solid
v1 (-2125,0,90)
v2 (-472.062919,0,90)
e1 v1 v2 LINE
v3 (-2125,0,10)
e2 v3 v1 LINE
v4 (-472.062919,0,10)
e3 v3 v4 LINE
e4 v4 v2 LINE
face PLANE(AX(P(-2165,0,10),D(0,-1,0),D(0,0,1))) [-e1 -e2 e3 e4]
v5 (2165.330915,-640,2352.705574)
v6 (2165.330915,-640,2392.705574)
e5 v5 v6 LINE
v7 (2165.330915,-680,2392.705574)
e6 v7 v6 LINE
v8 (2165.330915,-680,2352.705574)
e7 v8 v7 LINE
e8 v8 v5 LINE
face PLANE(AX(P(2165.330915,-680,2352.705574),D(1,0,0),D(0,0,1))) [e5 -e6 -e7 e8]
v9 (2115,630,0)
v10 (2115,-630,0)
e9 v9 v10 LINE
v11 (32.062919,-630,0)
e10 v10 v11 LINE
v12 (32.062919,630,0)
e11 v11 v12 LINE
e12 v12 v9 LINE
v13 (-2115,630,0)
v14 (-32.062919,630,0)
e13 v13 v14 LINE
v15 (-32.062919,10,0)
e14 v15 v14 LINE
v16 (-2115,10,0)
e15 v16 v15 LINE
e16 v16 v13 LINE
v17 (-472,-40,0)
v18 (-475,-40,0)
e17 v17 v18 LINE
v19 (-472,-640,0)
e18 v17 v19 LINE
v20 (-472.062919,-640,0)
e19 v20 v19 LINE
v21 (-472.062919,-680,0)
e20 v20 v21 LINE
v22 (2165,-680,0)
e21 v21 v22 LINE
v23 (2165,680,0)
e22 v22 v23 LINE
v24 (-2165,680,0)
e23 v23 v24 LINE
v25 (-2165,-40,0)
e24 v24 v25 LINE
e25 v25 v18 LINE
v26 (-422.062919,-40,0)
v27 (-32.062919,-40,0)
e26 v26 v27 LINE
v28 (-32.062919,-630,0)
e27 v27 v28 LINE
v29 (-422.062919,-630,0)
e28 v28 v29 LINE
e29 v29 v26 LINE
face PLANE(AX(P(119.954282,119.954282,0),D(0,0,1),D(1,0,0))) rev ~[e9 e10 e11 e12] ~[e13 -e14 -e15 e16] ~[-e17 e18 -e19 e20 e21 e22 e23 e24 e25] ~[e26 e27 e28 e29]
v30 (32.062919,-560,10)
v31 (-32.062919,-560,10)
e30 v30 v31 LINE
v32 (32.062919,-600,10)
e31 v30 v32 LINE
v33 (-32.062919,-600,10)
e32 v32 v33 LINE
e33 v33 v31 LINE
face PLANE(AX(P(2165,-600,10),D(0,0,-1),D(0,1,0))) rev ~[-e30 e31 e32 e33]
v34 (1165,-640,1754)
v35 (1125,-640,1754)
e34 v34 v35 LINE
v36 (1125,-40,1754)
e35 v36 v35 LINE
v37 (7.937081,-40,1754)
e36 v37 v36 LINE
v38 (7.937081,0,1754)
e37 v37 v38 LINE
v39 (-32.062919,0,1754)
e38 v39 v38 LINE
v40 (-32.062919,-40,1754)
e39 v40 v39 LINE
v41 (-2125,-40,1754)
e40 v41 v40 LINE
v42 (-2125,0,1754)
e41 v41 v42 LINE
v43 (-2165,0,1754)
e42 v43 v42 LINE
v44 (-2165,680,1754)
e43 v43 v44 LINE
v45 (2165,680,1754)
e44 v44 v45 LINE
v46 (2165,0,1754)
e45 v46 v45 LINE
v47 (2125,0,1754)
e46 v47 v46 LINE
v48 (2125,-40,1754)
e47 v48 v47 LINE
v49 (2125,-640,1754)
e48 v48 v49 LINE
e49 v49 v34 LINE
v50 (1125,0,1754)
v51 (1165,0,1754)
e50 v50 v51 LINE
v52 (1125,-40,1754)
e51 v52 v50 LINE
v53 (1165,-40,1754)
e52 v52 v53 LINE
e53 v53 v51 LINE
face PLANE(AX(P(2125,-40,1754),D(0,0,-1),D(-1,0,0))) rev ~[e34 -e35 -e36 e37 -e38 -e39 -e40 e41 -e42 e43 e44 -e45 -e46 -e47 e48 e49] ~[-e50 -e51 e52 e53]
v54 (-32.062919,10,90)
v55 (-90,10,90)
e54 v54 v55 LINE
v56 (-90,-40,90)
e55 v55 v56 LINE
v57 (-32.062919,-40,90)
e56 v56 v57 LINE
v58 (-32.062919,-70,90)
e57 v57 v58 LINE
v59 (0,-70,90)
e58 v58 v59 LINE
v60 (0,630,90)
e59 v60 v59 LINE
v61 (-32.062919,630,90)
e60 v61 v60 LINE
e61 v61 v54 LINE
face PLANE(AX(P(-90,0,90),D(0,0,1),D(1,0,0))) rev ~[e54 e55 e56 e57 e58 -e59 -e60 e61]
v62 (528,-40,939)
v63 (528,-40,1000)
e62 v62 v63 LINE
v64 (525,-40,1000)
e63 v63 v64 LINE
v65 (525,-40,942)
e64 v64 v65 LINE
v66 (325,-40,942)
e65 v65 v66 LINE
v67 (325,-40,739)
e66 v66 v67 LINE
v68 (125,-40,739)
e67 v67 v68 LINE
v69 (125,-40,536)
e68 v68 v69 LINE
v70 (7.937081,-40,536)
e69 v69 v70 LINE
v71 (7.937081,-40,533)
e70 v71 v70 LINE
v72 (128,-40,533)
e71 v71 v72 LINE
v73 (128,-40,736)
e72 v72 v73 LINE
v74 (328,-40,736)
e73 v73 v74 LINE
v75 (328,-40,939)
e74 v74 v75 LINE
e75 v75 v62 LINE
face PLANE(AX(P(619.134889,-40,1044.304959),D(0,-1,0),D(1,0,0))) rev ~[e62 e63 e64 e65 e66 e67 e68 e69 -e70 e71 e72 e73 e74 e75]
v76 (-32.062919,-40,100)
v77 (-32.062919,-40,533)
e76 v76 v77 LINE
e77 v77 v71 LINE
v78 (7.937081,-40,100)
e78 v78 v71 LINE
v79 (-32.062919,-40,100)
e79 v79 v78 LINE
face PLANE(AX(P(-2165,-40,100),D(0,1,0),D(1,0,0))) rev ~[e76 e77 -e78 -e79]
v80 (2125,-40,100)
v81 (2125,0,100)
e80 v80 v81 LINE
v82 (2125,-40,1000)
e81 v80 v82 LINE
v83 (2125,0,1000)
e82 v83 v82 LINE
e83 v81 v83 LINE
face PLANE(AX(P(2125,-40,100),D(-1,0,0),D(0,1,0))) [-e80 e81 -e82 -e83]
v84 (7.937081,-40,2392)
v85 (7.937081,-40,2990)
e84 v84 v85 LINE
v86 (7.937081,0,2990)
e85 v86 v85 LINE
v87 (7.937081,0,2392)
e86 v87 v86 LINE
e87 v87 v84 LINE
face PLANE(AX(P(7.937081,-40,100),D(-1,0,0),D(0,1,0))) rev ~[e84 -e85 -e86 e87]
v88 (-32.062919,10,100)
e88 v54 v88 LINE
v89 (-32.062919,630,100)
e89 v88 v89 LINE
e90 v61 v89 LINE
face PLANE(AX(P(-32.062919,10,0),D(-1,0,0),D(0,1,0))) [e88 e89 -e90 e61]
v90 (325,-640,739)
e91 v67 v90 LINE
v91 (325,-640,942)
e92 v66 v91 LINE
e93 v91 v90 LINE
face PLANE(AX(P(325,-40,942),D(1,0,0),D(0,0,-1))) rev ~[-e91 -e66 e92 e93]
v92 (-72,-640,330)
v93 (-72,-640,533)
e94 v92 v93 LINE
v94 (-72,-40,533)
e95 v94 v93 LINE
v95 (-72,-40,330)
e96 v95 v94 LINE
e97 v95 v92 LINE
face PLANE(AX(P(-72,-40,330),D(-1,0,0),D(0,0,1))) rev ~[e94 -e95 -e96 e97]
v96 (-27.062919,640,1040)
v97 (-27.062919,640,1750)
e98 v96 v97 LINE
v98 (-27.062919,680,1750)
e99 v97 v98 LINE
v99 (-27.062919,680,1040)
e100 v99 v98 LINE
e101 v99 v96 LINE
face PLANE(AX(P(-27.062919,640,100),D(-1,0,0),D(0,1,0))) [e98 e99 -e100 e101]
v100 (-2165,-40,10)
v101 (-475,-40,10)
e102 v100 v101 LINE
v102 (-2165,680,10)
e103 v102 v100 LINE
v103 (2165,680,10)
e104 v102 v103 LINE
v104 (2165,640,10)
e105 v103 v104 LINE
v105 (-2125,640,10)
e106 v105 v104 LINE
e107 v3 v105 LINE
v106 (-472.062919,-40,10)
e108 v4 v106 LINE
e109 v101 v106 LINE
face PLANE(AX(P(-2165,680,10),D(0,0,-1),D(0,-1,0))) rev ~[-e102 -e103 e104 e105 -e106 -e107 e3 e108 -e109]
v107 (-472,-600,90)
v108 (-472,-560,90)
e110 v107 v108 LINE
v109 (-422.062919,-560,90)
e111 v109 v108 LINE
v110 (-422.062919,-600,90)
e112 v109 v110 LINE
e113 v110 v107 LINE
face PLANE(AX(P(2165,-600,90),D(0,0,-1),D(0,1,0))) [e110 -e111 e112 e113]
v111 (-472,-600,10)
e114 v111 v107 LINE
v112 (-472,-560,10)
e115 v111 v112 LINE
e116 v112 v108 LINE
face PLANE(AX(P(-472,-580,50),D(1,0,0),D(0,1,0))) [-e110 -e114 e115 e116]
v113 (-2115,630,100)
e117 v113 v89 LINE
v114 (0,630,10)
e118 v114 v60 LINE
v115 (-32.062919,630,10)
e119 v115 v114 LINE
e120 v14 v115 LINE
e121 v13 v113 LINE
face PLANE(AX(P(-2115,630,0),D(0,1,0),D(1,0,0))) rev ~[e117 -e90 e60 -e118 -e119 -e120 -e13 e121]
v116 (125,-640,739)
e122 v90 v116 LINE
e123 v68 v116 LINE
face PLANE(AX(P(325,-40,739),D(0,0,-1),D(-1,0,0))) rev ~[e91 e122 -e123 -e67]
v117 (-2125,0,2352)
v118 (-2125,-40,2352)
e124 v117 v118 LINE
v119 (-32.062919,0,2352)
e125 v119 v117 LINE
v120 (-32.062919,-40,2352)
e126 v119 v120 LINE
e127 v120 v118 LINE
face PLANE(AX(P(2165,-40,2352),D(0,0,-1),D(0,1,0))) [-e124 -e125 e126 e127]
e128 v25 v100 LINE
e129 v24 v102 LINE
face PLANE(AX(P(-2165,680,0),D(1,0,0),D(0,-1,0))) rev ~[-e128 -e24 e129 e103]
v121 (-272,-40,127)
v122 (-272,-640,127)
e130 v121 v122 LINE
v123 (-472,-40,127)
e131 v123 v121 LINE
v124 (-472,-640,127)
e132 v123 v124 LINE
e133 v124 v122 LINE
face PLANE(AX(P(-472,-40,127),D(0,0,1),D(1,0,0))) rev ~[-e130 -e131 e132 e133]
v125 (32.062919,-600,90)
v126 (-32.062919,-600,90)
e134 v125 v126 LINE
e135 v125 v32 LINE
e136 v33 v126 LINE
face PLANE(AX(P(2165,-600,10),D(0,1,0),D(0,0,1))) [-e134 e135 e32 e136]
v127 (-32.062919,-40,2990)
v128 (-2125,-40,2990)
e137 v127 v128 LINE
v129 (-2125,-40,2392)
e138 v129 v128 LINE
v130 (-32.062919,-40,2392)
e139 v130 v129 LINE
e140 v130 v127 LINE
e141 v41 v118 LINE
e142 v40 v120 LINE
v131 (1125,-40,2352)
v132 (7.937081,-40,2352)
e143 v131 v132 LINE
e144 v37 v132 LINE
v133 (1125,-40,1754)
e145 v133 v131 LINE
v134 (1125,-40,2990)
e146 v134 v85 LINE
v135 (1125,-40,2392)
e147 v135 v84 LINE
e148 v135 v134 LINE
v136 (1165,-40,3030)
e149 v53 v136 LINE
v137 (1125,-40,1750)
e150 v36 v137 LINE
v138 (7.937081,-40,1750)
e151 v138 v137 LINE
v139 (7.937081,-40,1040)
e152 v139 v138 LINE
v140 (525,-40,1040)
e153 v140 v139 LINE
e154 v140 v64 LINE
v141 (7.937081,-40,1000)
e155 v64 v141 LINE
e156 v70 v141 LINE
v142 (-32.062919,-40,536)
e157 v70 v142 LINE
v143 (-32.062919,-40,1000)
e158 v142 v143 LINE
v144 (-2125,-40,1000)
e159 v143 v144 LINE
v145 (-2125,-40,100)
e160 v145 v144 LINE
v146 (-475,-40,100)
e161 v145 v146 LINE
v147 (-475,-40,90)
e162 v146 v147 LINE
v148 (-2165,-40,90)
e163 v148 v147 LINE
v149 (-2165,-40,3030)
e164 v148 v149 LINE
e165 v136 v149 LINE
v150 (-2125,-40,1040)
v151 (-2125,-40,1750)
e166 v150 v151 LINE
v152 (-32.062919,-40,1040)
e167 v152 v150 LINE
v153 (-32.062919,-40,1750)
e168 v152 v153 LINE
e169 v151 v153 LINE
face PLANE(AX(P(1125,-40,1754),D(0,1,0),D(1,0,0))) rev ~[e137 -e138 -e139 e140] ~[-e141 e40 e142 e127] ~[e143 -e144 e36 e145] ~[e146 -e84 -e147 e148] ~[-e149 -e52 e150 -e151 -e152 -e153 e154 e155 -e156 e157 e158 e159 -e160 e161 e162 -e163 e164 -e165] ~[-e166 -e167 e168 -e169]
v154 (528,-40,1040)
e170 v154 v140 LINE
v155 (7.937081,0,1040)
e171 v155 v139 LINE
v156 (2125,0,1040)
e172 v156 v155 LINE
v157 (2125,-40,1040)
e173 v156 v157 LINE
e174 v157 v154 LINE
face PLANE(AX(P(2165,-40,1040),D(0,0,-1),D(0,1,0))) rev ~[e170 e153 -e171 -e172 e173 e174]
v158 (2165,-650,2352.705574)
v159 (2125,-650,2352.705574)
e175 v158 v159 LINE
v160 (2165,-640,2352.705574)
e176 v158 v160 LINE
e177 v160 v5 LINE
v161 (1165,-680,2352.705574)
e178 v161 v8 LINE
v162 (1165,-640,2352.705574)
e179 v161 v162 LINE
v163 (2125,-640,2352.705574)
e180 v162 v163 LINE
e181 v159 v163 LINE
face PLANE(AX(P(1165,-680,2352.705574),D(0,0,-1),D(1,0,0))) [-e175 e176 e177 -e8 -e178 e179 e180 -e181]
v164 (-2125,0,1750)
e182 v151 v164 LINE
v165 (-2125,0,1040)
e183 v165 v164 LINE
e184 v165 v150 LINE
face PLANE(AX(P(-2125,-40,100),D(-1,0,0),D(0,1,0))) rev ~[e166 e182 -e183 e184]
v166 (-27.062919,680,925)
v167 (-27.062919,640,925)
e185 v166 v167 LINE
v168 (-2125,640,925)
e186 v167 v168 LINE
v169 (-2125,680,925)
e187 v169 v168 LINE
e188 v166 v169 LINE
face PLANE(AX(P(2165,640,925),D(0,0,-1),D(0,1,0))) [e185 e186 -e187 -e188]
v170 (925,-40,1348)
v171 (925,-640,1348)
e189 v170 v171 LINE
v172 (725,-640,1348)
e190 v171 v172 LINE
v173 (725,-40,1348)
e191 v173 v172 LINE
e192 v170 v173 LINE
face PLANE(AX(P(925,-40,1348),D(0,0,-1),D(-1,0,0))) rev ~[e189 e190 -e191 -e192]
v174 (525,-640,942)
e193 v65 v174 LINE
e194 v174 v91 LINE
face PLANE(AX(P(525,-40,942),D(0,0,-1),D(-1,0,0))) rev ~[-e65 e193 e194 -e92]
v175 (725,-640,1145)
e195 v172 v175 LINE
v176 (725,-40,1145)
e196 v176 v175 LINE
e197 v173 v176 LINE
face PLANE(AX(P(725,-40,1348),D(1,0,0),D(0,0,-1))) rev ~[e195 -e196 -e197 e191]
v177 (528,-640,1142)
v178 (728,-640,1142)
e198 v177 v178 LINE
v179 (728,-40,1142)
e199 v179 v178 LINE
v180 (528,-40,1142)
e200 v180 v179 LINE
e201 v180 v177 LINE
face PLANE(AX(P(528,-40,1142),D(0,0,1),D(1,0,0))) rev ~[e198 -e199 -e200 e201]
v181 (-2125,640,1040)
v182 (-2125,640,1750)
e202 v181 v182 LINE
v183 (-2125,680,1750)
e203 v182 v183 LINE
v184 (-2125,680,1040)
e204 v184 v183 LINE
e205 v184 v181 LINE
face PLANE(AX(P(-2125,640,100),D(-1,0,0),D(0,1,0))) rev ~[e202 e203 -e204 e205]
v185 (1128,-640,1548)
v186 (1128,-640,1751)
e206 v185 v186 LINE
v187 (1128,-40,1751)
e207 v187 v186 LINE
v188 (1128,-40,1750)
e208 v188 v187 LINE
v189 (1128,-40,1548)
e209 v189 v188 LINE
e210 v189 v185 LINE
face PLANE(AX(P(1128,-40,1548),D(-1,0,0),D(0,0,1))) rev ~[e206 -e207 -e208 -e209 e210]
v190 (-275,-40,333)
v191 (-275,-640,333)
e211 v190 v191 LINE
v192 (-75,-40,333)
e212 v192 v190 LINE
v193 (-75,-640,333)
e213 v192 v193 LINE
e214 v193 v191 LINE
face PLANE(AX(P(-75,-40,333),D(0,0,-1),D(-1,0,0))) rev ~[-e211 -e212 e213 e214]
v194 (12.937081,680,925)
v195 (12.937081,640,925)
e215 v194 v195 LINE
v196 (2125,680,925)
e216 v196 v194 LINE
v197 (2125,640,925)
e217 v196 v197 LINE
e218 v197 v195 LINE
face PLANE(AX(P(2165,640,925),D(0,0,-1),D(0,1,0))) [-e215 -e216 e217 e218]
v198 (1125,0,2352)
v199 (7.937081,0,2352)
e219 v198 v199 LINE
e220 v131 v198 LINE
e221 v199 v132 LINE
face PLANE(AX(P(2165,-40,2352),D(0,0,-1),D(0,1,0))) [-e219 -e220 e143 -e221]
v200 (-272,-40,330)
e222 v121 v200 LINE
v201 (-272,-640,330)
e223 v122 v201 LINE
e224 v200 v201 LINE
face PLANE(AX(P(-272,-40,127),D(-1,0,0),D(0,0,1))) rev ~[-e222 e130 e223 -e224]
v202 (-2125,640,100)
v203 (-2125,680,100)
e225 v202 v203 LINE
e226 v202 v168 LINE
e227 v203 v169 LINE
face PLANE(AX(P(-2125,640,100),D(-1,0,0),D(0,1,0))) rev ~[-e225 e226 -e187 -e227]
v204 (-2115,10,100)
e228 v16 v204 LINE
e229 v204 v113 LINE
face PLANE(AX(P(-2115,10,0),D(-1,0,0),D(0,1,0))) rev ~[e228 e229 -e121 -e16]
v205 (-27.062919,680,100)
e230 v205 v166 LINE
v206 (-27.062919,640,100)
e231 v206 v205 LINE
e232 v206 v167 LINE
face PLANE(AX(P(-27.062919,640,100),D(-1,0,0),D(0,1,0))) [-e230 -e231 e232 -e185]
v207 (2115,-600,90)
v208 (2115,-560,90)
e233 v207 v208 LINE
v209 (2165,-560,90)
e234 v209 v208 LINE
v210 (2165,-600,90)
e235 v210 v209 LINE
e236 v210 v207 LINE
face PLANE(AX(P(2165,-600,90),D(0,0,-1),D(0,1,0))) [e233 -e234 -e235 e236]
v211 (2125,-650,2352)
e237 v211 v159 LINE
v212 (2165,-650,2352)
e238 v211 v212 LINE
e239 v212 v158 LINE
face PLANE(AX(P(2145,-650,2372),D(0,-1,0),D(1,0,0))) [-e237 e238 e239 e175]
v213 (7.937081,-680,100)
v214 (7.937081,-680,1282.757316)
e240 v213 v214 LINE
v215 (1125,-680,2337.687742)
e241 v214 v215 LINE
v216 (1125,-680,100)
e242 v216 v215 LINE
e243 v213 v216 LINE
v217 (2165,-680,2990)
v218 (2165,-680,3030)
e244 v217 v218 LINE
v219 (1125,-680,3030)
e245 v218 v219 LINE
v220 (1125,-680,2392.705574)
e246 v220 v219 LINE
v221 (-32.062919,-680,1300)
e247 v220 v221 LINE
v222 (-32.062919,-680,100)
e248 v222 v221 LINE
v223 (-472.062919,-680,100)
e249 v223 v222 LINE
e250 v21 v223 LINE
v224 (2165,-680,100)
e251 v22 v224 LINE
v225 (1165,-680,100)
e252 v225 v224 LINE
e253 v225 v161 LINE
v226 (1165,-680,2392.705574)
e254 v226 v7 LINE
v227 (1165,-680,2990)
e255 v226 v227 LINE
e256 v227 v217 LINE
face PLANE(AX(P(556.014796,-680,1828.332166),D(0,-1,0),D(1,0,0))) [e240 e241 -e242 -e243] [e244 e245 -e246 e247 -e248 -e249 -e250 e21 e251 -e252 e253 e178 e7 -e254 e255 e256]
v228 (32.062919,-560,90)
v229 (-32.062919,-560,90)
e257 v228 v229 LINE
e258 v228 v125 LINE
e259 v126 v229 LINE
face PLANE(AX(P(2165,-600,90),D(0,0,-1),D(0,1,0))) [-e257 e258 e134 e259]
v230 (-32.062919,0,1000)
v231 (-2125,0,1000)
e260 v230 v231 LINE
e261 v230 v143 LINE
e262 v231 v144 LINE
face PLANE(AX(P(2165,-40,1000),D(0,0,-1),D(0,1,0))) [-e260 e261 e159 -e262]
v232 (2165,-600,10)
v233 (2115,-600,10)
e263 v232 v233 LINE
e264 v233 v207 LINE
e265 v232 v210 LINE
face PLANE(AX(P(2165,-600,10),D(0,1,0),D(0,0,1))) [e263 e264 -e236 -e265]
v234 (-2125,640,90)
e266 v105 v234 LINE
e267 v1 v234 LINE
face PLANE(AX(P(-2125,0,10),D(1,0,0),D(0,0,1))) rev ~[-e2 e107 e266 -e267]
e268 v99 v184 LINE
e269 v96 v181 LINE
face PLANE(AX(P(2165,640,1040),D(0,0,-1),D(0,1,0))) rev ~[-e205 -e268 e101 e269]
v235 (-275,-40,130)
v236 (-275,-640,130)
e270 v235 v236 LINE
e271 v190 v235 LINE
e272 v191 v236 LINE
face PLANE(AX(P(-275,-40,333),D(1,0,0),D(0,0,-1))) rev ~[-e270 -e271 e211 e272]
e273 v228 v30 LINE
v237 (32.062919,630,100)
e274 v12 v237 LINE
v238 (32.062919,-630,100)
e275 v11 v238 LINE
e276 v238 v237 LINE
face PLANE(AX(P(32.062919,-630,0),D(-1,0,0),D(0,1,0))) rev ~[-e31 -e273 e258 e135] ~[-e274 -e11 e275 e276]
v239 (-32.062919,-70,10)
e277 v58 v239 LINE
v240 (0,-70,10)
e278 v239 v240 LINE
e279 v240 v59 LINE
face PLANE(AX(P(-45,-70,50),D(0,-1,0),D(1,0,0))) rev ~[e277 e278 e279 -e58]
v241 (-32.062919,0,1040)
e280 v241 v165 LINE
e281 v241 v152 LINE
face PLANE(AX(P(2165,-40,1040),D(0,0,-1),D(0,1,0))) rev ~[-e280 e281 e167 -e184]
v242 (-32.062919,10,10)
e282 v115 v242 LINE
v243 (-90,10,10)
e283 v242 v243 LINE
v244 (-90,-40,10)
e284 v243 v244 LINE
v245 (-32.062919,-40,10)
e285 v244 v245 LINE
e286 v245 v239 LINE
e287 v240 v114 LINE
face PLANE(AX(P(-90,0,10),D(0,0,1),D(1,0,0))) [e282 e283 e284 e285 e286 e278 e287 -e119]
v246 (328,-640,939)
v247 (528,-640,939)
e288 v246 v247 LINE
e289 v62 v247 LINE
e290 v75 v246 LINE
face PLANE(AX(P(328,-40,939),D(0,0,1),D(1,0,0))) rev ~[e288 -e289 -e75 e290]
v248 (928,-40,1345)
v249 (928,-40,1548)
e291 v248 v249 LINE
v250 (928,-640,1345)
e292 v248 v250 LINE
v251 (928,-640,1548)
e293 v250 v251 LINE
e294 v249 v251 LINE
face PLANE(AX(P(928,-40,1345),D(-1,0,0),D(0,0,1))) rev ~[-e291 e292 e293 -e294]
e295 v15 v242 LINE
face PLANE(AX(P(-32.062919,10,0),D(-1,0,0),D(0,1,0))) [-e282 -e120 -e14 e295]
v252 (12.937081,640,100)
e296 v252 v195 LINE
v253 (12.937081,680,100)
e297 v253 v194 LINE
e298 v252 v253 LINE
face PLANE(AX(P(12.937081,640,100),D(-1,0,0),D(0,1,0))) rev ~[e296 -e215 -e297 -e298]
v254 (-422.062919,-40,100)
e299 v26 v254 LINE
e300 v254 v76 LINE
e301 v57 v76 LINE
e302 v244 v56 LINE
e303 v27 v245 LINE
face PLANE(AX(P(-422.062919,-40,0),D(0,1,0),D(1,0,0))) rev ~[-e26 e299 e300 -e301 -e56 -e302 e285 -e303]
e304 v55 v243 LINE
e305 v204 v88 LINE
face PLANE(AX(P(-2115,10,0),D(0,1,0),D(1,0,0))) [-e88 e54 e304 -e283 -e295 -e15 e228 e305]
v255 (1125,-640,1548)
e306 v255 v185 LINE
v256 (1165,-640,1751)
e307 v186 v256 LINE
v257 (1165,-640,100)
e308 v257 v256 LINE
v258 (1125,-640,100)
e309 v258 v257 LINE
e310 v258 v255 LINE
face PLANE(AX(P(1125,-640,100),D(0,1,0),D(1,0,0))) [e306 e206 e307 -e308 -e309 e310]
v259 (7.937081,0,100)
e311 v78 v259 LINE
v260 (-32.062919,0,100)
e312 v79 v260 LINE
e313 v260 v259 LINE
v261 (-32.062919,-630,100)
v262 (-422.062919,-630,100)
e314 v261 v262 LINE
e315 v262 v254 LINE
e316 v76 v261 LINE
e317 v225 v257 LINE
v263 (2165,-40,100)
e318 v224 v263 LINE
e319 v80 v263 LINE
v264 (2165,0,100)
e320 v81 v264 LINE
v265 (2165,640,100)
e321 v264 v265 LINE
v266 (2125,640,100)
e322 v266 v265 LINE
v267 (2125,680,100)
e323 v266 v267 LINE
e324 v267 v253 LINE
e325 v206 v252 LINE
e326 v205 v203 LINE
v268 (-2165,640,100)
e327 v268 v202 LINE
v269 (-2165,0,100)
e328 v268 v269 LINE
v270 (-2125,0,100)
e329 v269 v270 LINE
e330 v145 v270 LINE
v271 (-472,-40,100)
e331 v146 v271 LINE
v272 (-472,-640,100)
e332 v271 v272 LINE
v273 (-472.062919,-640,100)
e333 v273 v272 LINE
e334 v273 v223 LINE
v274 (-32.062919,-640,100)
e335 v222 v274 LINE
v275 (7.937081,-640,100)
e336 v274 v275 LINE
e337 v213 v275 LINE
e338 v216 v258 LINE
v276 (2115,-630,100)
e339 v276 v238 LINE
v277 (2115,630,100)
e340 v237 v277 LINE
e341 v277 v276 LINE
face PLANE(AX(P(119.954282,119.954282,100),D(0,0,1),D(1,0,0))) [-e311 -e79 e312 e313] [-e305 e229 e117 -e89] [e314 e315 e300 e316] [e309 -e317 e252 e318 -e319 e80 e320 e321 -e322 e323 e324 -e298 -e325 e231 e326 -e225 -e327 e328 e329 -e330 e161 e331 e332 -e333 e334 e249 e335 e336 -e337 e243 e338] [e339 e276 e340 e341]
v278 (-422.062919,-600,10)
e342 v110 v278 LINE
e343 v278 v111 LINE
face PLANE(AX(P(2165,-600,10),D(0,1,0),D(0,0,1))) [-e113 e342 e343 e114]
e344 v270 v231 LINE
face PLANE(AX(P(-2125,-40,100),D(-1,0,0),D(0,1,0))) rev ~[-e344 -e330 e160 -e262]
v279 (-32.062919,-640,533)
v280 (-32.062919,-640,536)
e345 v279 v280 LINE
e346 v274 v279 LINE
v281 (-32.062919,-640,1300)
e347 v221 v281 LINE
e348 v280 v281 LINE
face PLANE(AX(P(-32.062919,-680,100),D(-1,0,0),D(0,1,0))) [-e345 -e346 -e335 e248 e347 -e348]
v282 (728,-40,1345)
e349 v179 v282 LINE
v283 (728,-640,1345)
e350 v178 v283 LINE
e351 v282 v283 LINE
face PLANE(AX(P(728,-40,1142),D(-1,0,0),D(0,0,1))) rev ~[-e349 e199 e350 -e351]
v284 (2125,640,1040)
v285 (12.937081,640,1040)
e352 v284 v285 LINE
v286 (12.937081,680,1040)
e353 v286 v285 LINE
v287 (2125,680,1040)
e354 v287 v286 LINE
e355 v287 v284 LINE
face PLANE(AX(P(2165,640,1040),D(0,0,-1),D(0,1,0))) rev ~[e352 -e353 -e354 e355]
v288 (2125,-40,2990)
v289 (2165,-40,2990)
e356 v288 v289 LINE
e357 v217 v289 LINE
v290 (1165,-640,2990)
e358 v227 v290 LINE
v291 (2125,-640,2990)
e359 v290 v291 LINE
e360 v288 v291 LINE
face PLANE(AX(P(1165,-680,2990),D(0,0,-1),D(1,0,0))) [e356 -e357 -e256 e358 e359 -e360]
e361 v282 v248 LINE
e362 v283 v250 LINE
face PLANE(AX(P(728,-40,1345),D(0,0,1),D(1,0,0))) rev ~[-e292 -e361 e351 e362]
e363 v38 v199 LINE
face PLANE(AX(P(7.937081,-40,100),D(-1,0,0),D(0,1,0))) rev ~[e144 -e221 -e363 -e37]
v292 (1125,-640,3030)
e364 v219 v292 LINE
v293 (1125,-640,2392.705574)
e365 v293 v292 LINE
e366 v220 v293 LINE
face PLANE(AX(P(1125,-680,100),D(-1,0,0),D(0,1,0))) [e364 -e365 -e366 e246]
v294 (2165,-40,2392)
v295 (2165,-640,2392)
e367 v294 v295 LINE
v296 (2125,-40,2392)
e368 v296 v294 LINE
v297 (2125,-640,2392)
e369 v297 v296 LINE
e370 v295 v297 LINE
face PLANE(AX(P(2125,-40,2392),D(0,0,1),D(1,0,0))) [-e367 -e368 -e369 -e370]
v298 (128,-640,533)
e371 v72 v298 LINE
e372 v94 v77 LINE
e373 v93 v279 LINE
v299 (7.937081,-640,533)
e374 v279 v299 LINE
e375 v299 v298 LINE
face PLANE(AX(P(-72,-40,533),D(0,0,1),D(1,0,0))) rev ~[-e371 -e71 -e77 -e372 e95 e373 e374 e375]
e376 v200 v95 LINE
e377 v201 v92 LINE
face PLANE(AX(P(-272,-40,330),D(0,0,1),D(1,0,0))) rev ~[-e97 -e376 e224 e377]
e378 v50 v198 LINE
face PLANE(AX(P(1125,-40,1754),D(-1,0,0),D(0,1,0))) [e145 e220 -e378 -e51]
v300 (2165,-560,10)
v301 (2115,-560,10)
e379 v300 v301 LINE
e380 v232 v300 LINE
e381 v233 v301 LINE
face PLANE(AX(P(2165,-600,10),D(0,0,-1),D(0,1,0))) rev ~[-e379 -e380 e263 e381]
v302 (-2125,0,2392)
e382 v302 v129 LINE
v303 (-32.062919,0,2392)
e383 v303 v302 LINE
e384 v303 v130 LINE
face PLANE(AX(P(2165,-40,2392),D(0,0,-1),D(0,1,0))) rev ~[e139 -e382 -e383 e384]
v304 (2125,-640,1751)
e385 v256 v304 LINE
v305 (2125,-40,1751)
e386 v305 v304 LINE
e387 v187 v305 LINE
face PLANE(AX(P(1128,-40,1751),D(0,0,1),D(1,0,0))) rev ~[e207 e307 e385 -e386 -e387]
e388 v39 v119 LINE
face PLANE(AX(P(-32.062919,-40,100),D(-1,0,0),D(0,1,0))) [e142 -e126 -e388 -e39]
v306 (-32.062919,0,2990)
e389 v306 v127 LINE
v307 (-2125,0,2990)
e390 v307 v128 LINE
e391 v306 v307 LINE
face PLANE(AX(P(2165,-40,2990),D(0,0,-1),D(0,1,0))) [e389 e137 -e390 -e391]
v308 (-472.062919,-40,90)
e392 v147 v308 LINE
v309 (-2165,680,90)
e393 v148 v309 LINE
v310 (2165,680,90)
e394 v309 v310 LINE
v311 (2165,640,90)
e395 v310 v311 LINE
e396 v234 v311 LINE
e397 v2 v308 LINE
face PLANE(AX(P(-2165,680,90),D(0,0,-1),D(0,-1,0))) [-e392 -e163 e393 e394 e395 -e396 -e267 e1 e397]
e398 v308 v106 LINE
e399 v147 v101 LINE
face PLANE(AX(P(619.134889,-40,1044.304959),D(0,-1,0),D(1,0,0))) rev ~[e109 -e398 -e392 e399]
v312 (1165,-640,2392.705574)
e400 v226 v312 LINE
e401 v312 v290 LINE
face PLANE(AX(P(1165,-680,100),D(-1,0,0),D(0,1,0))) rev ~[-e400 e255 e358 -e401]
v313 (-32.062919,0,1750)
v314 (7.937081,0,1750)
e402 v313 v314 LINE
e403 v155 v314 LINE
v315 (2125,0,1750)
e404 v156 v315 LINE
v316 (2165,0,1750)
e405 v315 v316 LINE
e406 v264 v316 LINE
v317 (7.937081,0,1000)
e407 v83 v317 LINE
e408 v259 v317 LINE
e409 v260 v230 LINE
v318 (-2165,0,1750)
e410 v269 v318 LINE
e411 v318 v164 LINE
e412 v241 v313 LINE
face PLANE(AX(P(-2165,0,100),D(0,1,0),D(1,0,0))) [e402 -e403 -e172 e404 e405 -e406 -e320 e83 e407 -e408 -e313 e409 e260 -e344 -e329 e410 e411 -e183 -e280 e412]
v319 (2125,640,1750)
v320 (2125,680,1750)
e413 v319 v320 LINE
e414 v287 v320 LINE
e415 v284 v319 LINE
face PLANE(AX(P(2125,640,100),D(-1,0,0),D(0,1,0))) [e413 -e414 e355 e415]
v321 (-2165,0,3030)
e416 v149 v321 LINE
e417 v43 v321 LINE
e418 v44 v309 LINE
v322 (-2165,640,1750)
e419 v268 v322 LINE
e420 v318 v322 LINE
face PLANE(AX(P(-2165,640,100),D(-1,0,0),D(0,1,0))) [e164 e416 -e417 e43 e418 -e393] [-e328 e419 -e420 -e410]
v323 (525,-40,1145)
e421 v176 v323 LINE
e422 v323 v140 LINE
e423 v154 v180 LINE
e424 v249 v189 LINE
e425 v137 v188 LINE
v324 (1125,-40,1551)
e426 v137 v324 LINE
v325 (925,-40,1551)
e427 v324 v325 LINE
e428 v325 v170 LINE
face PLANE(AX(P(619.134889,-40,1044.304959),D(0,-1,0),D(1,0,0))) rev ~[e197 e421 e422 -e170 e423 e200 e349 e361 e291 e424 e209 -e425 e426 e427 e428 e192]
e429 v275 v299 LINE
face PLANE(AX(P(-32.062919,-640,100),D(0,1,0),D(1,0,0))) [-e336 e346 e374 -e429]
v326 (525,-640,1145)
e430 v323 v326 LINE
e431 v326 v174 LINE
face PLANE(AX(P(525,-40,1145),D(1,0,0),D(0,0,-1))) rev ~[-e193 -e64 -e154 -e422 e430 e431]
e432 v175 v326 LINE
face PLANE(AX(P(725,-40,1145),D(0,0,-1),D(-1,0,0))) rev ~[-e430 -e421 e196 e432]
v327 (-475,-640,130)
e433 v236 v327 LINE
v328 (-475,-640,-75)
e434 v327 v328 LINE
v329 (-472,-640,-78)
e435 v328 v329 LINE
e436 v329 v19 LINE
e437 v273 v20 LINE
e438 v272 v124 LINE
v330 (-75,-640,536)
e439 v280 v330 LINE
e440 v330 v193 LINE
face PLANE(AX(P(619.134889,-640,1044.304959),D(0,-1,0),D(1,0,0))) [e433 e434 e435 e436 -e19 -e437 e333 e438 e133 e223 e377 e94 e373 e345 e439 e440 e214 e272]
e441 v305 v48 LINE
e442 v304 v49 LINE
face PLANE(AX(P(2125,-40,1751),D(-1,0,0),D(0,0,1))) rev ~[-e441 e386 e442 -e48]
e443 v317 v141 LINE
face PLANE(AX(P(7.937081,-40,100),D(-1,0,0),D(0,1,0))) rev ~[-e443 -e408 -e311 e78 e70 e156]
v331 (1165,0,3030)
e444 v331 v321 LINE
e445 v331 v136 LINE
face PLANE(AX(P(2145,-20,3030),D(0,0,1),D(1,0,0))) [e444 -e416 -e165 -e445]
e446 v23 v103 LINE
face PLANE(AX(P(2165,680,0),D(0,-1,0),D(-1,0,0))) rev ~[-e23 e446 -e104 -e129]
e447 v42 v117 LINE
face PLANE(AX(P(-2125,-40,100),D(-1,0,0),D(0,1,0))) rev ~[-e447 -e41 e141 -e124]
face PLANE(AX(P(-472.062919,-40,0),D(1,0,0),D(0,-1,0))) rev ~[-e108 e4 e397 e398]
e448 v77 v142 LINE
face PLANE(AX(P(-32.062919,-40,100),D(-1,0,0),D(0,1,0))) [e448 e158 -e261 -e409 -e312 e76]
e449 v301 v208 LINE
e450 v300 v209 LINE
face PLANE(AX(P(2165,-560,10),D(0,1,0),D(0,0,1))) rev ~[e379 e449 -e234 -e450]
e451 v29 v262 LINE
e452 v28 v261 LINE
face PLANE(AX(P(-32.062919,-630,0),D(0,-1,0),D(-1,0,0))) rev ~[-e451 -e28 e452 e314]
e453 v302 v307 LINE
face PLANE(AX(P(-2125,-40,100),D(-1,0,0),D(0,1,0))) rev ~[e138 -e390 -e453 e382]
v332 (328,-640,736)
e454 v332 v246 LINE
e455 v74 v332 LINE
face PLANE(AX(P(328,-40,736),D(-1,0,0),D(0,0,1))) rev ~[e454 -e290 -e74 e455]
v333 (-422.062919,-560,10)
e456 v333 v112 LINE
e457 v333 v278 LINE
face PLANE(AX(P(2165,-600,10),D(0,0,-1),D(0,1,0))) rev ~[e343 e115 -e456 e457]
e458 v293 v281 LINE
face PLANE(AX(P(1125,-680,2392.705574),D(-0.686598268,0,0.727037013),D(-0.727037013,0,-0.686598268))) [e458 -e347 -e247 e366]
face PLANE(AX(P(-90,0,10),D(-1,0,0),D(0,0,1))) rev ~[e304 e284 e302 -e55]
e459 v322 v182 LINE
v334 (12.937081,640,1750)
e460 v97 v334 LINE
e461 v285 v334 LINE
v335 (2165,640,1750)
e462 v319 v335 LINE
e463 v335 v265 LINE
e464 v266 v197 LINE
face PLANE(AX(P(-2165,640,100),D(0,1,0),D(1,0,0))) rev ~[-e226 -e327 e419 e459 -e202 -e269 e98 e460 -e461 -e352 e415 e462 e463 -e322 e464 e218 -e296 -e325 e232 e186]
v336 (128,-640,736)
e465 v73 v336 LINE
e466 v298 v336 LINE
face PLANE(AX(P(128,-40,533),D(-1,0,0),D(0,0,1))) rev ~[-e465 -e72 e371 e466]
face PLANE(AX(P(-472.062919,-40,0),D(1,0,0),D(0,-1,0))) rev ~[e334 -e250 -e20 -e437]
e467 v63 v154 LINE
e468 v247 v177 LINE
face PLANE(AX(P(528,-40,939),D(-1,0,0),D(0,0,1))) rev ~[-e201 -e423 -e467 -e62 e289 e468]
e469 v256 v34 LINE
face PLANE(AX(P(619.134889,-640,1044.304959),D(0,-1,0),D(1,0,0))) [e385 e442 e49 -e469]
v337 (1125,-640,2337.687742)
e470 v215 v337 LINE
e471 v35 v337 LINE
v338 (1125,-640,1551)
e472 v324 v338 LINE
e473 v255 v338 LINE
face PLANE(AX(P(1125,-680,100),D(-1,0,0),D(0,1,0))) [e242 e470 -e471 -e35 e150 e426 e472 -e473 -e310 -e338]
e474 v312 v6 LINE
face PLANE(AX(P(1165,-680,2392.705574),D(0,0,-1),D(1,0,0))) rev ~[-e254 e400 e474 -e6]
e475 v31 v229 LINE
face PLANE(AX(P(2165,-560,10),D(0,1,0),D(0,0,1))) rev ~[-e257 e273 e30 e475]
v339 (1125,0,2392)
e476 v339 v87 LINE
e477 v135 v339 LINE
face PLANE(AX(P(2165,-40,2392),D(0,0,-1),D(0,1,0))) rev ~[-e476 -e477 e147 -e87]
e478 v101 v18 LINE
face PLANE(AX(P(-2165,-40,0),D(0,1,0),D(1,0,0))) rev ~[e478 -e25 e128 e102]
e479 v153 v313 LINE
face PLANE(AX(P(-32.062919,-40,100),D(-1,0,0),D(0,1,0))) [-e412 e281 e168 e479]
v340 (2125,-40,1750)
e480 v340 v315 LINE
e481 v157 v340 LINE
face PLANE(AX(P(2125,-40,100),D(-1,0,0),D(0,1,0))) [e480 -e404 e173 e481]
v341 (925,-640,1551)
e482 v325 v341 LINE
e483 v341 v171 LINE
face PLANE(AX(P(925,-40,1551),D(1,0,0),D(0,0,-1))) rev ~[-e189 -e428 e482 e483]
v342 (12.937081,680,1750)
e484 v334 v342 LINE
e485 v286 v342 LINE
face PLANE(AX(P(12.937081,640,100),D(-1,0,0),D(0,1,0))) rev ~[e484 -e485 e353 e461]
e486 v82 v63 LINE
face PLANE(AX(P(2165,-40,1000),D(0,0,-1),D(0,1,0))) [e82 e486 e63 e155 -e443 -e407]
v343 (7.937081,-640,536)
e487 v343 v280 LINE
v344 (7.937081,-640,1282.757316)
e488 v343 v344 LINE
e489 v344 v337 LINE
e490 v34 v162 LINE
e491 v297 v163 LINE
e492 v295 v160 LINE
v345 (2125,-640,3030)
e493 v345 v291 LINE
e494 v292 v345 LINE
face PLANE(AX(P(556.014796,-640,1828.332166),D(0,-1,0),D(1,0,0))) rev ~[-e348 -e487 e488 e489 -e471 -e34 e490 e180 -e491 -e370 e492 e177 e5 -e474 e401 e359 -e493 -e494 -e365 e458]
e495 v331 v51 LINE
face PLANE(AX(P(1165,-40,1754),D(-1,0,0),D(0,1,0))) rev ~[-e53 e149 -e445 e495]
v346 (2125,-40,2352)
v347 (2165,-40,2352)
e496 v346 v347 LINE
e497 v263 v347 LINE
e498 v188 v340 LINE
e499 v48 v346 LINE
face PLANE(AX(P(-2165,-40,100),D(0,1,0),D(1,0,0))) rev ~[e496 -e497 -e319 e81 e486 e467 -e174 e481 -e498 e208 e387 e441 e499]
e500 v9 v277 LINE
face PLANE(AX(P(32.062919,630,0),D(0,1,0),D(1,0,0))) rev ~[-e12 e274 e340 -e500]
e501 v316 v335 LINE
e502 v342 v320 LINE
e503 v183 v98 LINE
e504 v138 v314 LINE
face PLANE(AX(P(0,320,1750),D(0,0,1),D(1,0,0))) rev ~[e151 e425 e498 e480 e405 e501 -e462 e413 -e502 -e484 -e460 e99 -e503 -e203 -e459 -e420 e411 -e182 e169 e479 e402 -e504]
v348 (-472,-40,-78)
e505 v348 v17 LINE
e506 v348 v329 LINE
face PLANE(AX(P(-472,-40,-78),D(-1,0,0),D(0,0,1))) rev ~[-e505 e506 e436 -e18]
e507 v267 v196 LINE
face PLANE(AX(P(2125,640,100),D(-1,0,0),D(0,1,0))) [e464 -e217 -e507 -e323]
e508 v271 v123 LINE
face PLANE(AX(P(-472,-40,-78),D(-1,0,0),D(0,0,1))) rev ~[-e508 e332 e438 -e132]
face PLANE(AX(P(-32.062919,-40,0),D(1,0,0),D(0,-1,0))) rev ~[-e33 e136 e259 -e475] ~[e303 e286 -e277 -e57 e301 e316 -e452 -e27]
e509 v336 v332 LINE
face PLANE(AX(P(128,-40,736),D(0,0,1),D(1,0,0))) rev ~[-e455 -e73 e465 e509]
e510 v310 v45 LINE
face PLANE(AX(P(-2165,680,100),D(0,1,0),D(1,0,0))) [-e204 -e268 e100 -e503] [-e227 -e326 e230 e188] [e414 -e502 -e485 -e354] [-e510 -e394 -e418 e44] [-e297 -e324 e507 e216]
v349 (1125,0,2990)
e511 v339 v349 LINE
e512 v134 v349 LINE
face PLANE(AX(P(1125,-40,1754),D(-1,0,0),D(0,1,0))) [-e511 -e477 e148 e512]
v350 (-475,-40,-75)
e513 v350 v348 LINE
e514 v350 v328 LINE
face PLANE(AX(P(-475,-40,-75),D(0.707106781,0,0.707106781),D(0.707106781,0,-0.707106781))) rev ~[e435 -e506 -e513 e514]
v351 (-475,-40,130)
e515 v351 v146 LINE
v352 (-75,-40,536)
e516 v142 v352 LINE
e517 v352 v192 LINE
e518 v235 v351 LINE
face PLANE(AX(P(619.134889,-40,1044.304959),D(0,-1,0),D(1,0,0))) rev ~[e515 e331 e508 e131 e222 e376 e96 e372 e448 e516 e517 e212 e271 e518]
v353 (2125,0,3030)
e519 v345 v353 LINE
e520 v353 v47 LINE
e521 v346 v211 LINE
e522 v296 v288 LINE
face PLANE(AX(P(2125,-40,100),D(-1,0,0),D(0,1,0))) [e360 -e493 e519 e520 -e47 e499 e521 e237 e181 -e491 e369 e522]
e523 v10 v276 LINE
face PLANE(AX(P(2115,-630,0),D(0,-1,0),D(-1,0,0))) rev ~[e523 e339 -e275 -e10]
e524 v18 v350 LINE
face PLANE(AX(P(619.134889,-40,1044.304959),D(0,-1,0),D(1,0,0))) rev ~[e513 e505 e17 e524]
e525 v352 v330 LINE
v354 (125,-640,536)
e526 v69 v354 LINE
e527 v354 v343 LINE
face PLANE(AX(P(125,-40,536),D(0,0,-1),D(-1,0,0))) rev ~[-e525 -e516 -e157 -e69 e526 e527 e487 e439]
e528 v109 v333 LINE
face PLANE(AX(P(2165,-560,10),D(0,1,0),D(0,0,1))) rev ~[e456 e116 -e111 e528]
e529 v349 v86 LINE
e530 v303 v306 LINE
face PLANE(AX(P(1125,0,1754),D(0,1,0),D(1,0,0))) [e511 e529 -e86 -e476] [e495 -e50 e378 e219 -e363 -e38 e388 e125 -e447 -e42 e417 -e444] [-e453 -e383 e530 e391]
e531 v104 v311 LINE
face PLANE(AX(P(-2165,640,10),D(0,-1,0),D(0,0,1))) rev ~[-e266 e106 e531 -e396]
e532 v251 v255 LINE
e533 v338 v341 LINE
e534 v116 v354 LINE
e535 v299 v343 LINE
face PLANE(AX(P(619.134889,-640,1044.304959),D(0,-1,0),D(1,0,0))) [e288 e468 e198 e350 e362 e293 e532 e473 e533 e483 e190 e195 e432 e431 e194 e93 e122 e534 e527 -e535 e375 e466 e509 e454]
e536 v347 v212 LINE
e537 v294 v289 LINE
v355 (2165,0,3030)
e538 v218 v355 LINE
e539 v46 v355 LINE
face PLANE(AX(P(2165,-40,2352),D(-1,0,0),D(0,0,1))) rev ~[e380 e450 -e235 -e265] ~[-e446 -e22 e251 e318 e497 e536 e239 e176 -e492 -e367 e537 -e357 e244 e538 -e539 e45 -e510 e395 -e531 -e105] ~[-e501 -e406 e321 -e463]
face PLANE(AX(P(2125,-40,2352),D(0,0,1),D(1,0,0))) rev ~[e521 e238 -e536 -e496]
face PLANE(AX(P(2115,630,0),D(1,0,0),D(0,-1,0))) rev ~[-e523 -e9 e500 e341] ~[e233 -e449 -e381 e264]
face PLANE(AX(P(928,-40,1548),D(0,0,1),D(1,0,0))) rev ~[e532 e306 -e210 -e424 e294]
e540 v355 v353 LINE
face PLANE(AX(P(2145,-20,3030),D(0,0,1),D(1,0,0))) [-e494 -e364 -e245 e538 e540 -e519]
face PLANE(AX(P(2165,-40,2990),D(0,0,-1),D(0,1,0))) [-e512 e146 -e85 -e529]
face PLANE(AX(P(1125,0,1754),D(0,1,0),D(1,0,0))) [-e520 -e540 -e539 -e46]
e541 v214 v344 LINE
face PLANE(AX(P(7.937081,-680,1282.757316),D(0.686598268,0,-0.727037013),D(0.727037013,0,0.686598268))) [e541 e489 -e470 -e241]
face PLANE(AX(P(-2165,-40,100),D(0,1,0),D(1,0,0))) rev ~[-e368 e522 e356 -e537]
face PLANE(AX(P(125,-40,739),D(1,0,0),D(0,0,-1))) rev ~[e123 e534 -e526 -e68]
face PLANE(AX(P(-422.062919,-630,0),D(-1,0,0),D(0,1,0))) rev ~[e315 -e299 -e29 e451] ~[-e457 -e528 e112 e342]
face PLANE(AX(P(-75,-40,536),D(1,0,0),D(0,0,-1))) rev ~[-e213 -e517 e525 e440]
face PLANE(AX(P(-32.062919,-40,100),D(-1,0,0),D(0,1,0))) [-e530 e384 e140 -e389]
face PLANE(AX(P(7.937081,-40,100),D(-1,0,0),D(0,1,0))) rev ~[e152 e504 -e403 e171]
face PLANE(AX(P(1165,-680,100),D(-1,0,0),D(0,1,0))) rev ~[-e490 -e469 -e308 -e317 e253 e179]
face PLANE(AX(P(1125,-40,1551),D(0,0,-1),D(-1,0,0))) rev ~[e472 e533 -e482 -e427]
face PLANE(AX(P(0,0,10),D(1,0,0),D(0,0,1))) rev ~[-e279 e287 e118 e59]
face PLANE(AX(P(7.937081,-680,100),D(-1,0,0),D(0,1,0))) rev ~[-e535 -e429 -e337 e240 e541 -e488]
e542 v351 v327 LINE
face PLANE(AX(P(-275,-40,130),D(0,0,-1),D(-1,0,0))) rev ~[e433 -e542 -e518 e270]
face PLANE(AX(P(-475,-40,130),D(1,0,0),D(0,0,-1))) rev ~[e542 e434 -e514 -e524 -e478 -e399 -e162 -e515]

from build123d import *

# Parameters (mm, degrees)
F0_W          = 2082.9370811584
F0_H          = 620
F0_W_2        = 50
F0_H_2        = 590
F1_DEPTH      = 100
F2_W          = 40
F2_H          = 80
F3_DEPTH      = 1692.9370811584
F4_DEPTH      = 4330.001
F5_W          = 40
F5_H          = 80
F6_DEPTH      = 680.001
F8_W          = 90
F8_H          = 80
F9_DEPTH      = 630
F9_DEPTH_BACK = 70
F10_W         = 40
F10_H         = 40
F11_DEPTH     = 2930
F12_W         = 4330
F12_H         = 720
F13_DEPTH     = 4
F14_DEPTH     = 1650
F15_W         = 40
F15_H         = 40
F15_H_2       = 115
F16_DEPTH     = 4300
F20_DEPTH     = 600
F21_W         = 40
F21_H         = 40
F22_DEPTH     = 2930
F23_DEPTH     = 1200
F24_W         = 1000.3309154511
F24_H         = 40
F24_W_2       = 1000
F25_DEPTH     = 40
F17_W         = 40
F17_H         = 40
F26_DEPTH     = 610
F27_W         = 40
F27_H         = 40
F28_DEPTH     = 1275
F29_W         = 960
F29_H         = 1083.7077188492
F30_DEPTH     = 50
F31_W         = 40
F31_H         = 80
F32_DEPTH     = 2637


# Not quite as in the source:
# - a feature names something its author has since deleted; it is built from what else it names


with BuildPart() as f1:
    # F0 (on Top) → F1 (new body)
    with BuildSketch(Plane.XY):
        Polygon((2165, -680), (2165, 680), (-2165, 680), (-2165, -40), (-472.0629188416, -40), (-422.0629188416, -40), (-32.0629188416, -40), (-32.0629188416, -630), (-32.0629188416, -680), align=None)
        with Locations((-1073.5314594208, 320)):
            Rectangle(F0_W, F0_H, mode=Mode.SUBTRACT)
        Polygon((2115, 630), (2115, -630), (32.0629188416, -630), (32.0629188416, -9.9903011755), (32.0629188416, 630), align=None, mode=Mode.SUBTRACT)
        with Locations((-447.0629188416, -335)):
            Rectangle(F0_W_2, F0_H_2)
        Polygon((-472.0629188416, -680), (-32.0629188416, -680), (-32.0629188416, -630), (-422.0629188416, -630), (-472.0629188416, -630), align=None)
    extrude(amount=F1_DEPTH)

    # F2 (on face) → F3 (cut, through all)
    with BuildSketch(Plane(origin=(-2165, 0, 0), x_dir=(0, -1, 0), z_dir=(-1, 0, 0))):
        with Locations((20, 50)):
            Rectangle(F2_W, F2_H)
    extrude(amount=-F3_DEPTH, mode=Mode.SUBTRACT)

    # F2 (on face) → F4 (cut, through all)
    with BuildSketch(Plane(origin=(-2165, 0, 0), x_dir=(0, -1, 0), z_dir=(-1, 0, 0))):
        with Locations((-660, 50)):
            Rectangle(F2_W, F2_H)
    extrude(amount=-F4_DEPTH, mode=Mode.SUBTRACT)

    # F5 (on face) → F6 (cut, through all)
    with BuildSketch(Plane.XZ):
        with Locations((-2145, 50)):
            Rectangle(F5_W, F5_H)
    extrude(amount=-F6_DEPTH, mode=Mode.SUBTRACT)

    # F8 (on Front) → F9 (cut, two sides)
    with BuildSketch(Plane.XZ) as f9_sk:
        with Locations((-45, 50)):
            Rectangle(F8_W, F8_H)
    extrude(amount=-F9_DEPTH, mode=Mode.SUBTRACT)
    extrude(f9_sk.sketch, amount=F9_DEPTH_BACK, mode=Mode.SUBTRACT)

    # F10 (on face) → F11 (join)
    with BuildSketch(Plane.XY.offset(100)):
        with Locations((-2145, -20)):
            Rectangle(F10_W, F10_H)
        with Locations((-12.0629188416, -20)):
            Rectangle(F10_W, F10_H)
        with Locations((2145, -20)):
            Rectangle(F10_W, F10_H)
    extrude(amount=F11_DEPTH)

    # F12 (on offset) → F13 (join)
    with BuildSketch(Plane.XY.offset(1750)):
        with Locations((0, 320)):
            Rectangle(F12_W, F12_H)
    extrude(amount=F13_DEPTH)

    # F10 (on face) → F14 (join)
    with BuildSketch(Plane.XY.offset(100)):
        with Locations((-2145, 660)):
            Rectangle(F10_W, F10_H)
        with Locations((2145, 660)):
            Rectangle(F10_W, F10_H)
        with Locations((-7.0629188416, 660)):
            Rectangle(F10_W, F10_H)
        with Locations((-2145, -20)):
            Rectangle(F10_W, F10_H)
        with Locations((-12.0629188416, -20)):
            Rectangle(F10_W, F10_H)
        with Locations((2145, -20)):
            Rectangle(F10_W, F10_H)
    extrude(amount=F14_DEPTH)

    # F15 (on face) → F16 (join)
    with BuildSketch(Plane.YZ.offset(2165)):
        with Locations((-20, 3010)):
            Rectangle(F15_W, F15_H)
        with Locations((660, 982.5)):
            Rectangle(F15_W, F15_H_2)
        with Locations((-20, 1020)):
            Rectangle(F15_W, F15_H)
        with Locations((-20, 2372)):
            Rectangle(F15_W, F15_H)
    extrude(amount=-F16_DEPTH)

    # F19 (on offset) → F20 (join)
    with BuildSketch(Plane.XZ.offset(40)):
        Polygon((2125, 1751), (2125, 1754), (1125, 1754), (1125, 1551), (925, 1551), (925, 1348), (725, 1348), (725, 1145), (525, 1145), (525, 942), (325, 942), (325, 739), (125, 739), (125, 536), (-75, 536), (-75, 333), (-275, 333), (-275, 130), (-475, 130), (-475, -75), (-472, -78), (-472, 127), (-272, 127), (-272, 330), (-72, 330), (-72, 533), (128, 533), (128, 736), (328, 736), (328, 939), (528, 939), (528, 1142), (728, 1142), (728, 1345), (928, 1345), (928, 1548), (1128, 1548), (1128, 1751), align=None)
    extrude(amount=F20_DEPTH)

    # F21 (on face) → F22 (join)
    with BuildSketch(Plane.XY.offset(100)):
        with Locations((1145, -660)):
            Rectangle(F21_W, F21_H)
    extrude(amount=F22_DEPTH)

    # F21 (on face) → F23 (join)
    with BuildSketch(Plane.XY.offset(100)):
        with Locations((-12.0629188416, -660)):
            Rectangle(F21_W, F21_H)
    extrude(amount=F23_DEPTH)

    # F24 (on face) → F25 (join)
    with BuildSketch(Plane.XZ.offset(680)):
        Polygon((1125, 2392.7055740356), (-32.0629188416, 1300), (7.9370811584, 1300), (7.9370811584, 1282.7573162751), (1125, 2337.687742348), (1125, 2352.7055740356), align=None)
        with Locations((1665.1654577255, 2372.7055740356)):
            Rectangle(F24_W, F24_H)
        with Locations((1665, 3010)):
            Rectangle(F24_W_2, F24_H)
    extrude(amount=-F25_DEPTH)

    # F17 (on face) → F26 (join)
    with BuildSketch(Plane.XZ.offset(40)):
        with Locations((2145, 2372)):
            Rectangle(F17_W, F17_H)
        with Locations((2145, 3010)):
            Rectangle(F17_W, F17_H)
    extrude(amount=F26_DEPTH)

    # F27 (on face) → F28 (join)
    with BuildSketch(Plane.XY.offset(1754)):
        with Locations((1145, -20)):
            Rectangle(F27_W, F27_H)
    extrude(amount=F28_DEPTH)

    # F29 (on face) → F30 (cut)
    with BuildSketch(Plane(origin=(0, 0, 0), x_dir=(-1, 0, 0), z_dir=(0, 1, 0))):
        with Locations((-1645, 2488.1461405754)):
            Rectangle(F29_W, F29_H)
    extrude(amount=-F30_DEPTH, mode=Mode.SUBTRACT)

    # F31 (on face) → F32 (cut, through all)
    with BuildSketch(Plane.YZ.offset(2165)):
        with Locations((-580, 50)):
            Rectangle(F31_W, F31_H)
    extrude(amount=-F32_DEPTH, mode=Mode.SUBTRACT)


solid = f1.part
